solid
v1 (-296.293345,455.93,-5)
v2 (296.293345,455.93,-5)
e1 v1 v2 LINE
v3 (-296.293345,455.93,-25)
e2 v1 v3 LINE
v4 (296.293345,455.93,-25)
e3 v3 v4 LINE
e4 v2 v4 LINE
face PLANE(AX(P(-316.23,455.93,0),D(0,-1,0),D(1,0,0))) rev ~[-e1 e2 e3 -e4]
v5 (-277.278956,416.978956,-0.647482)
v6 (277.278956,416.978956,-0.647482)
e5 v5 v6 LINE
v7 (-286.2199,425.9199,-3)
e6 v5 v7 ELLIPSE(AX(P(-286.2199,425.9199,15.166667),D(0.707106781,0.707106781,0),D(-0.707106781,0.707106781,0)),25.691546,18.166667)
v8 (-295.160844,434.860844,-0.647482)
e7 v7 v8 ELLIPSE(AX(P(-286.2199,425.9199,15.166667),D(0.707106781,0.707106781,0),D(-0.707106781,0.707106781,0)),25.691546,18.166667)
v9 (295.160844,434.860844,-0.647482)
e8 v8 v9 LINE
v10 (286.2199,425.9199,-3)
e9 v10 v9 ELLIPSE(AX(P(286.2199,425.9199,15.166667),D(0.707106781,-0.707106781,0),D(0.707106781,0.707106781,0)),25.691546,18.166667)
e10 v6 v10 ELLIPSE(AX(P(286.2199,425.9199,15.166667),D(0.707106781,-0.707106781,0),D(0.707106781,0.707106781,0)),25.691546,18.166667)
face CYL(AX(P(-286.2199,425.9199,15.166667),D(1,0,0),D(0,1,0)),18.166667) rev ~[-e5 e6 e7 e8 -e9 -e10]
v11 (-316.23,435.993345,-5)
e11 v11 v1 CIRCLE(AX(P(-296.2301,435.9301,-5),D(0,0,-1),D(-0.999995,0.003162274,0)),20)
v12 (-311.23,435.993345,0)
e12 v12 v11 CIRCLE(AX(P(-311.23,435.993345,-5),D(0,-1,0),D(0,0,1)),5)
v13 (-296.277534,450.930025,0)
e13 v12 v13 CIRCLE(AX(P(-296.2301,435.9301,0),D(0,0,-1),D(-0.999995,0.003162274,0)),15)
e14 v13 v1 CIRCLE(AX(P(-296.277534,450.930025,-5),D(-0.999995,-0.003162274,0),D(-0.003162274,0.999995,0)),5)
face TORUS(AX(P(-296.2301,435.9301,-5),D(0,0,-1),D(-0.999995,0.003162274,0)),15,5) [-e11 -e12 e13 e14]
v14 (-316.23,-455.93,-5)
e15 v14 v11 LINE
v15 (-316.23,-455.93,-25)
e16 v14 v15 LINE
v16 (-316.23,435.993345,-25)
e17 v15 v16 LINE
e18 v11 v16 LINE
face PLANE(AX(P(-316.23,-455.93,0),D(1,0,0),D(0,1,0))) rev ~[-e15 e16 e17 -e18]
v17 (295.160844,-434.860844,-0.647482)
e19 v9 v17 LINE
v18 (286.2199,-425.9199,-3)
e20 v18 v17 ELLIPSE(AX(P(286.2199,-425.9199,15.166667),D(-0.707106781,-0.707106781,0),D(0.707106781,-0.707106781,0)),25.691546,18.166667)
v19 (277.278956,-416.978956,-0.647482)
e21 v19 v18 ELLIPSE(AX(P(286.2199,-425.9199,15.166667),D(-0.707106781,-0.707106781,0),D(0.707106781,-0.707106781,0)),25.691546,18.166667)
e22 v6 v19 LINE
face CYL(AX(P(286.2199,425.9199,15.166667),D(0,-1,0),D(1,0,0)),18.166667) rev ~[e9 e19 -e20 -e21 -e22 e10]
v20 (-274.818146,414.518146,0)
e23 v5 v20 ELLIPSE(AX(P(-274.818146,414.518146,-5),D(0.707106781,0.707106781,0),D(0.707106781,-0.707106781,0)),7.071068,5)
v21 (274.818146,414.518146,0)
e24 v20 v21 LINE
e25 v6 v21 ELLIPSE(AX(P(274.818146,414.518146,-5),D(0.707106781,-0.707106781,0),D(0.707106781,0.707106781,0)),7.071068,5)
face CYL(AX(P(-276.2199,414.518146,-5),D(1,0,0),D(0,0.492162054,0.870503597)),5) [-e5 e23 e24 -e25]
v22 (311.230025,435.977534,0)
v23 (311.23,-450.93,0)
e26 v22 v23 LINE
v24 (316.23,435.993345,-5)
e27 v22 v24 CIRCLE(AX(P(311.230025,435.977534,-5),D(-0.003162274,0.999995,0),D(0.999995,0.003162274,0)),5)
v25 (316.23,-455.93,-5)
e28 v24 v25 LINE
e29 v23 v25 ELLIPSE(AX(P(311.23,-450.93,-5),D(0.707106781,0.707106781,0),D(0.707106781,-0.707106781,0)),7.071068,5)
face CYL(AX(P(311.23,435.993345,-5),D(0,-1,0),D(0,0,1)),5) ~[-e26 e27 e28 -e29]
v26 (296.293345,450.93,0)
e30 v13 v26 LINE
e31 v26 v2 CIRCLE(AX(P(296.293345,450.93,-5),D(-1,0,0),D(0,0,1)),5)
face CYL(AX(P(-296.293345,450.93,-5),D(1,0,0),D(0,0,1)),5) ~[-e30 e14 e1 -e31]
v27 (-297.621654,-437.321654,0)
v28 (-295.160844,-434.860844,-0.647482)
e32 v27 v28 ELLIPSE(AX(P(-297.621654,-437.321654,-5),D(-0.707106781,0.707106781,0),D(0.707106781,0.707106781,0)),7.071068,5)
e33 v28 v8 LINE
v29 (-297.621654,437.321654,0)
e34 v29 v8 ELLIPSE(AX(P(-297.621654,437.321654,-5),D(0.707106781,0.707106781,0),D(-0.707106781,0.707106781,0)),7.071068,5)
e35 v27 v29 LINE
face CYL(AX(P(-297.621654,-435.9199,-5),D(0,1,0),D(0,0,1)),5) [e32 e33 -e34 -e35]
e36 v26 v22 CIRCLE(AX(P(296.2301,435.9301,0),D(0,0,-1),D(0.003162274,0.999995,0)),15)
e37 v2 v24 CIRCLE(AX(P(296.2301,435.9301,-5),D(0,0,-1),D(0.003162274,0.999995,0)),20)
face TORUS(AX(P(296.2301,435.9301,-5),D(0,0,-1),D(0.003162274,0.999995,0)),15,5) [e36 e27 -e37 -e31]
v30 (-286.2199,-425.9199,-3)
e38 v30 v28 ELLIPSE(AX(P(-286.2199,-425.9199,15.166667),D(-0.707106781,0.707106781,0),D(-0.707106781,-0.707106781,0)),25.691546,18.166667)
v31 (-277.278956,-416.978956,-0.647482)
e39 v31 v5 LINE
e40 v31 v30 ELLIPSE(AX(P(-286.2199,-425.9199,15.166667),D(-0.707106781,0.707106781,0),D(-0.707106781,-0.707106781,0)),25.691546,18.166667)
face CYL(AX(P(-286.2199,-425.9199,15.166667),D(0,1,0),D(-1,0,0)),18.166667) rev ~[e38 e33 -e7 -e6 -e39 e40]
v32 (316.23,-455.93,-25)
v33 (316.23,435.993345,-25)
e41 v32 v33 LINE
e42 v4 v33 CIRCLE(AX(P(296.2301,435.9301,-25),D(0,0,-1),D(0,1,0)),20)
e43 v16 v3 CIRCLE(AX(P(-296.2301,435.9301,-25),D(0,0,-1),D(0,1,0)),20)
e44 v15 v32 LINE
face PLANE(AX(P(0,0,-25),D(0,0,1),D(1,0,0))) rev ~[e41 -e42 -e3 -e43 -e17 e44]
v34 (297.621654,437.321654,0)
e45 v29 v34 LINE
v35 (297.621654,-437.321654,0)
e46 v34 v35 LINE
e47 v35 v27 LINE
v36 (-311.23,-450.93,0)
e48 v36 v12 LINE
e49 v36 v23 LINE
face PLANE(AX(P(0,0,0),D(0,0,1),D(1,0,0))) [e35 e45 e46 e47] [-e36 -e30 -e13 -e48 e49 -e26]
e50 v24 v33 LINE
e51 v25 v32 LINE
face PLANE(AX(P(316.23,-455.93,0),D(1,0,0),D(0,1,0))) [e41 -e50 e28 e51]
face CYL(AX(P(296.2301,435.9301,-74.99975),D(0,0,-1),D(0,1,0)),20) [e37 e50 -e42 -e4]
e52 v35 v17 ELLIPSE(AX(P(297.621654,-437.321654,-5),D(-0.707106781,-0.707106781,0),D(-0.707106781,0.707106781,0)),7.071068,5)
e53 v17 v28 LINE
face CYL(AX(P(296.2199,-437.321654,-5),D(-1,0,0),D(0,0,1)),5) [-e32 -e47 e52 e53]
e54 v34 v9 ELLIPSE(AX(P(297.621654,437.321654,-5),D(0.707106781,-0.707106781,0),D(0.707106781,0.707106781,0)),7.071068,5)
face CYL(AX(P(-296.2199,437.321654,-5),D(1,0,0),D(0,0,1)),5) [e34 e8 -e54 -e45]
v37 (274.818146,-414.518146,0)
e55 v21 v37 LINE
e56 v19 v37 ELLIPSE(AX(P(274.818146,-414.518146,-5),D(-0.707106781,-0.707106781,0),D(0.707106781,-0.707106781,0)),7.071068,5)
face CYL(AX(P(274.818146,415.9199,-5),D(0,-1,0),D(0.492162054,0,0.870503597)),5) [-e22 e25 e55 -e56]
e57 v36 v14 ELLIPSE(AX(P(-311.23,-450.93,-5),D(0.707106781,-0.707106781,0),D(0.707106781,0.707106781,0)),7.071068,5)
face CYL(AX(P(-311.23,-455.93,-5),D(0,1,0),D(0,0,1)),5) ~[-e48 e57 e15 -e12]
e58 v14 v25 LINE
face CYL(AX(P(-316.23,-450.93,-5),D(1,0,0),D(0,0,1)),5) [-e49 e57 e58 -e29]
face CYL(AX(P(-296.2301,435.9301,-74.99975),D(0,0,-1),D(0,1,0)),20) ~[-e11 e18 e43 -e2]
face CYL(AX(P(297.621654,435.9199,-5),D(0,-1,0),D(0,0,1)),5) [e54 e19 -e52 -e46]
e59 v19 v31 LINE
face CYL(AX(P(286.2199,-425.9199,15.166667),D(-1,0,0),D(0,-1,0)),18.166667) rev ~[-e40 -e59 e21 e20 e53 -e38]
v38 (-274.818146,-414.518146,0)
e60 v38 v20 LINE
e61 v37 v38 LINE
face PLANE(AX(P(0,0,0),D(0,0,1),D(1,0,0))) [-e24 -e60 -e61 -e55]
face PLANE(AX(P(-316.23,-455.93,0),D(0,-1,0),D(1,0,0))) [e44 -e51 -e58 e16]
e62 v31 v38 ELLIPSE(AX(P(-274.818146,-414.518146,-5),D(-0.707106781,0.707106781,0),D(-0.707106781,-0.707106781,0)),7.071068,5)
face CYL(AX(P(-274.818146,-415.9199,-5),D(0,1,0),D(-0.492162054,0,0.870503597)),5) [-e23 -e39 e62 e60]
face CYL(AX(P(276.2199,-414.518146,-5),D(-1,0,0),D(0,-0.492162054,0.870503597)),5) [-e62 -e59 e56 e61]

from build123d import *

# Parameters (mm, degrees)
F0_W        = 632.46
F0_H        = 911.86
F1_DEPTH    = 25
F3_R        = 18.1666666667
F6_T1_DEPTH = 124.9995000013
F7_R        = 5


# Not quite as in the source:
# - a fillet or chamfer that OpenCascade refuses, or shapes differently, is made with other operations: its cross-section is extruded or revolved along the edge and cut away or added


with BuildPart() as f1:
    # F0 (on Top) → F1 (new body)
    with BuildSketch(Plane.XY):
        Rectangle(F0_W, F0_H)
    extrude(amount=-F1_DEPTH)


with BuildPart() as f4:
    # F4: sweep along a path in F2
    with BuildLine(Plane.XY) as f4_path:
        Line((-286.2199, 425.9199), (286.2199, 425.9199))
        Line((286.2199, 425.9199), (286.2199, -425.9199))
        Line((286.2199, -425.9199), (-286.2199, -425.9199))
        Line((-286.2199, -425.9199), (-286.2199, 425.9199))
    # F3 (on Front) → F4 (sweep)
    with BuildSketch(Plane.XZ):
        with Locations((286.2199, 15.1666666667)):
            Circle(F3_R)
    sweep(path=f4_path.line, transition=Transition.RIGHT)


with BuildPart() as f1_1:
    add(f1.part)

    # F5: cut F4
    add(f4.part, mode=Mode.SUBTRACT)

    # F6: fillet of radius 20 on 2 edges, made by hand

    # F6_s2 → F6_t1 (cut)
    with BuildSketch(Plane.XY.offset(-74.9997500006)):
        with BuildLine():
            ThreePointArc((296.2301, 455.9301), (310.3722356237, 450.0722356237), (316.2301, 435.9301))
            Line((316.2301, 435.9301), (316.6301, 435.9301))
            ThreePointArc((316.6301, 435.9301), (316.63, 445.93005), (316.63, 455.93))
            Line((316.63, 455.93), (316.23, 456.33))
            ThreePointArc((316.23, 456.33), (306.23005, 456.33), (296.2301, 456.3301))
            Line((296.2301, 456.3301), (296.2301, 455.9301))
        make_face()
        with BuildLine():
            ThreePointArc((-296.2301, 455.9301), (-310.3722356237, 450.0722356237), (-316.2301, 435.9301))
            Line((-316.2301, 435.9301), (-316.6301, 435.9301))
            ThreePointArc((-316.6301, 435.9301), (-316.63, 445.93005), (-316.63, 455.93))
            Line((-316.63, 455.93), (-316.23, 456.33))
            ThreePointArc((-316.23, 456.33), (-306.23005, 456.33), (-296.2301, 456.3301))
            Line((-296.2301, 456.3301), (-296.2301, 455.9301))
        make_face()
    extrude(amount=F6_T1_DEPTH, mode=Mode.SUBTRACT)

    # F7
    f7_edges = [f1_1.edges().sort_by_distance(p)[0] for p in [
        (0, 415.9199, 0),
        (276.2199, 0, 0),
        (0, -415.9199, 0),
        (-276.2199, 0, 0),
        (0, 455.93, 0),
        (-310.372236, 450.072236, 0),
        (-316.23, -9.968327, 0),
        (310.372236, 450.072236, 0),
        (316.23, -9.968327, 0),
        (0, -455.93, 0),
        (-296.2199, 0, 0),
        (0, -435.9199, 0),
        (0, 435.9199, 0),
        (296.2199, 0, 0),
    ]]
    fillet(f7_edges, radius=F7_R)


solid = f1_1.part
